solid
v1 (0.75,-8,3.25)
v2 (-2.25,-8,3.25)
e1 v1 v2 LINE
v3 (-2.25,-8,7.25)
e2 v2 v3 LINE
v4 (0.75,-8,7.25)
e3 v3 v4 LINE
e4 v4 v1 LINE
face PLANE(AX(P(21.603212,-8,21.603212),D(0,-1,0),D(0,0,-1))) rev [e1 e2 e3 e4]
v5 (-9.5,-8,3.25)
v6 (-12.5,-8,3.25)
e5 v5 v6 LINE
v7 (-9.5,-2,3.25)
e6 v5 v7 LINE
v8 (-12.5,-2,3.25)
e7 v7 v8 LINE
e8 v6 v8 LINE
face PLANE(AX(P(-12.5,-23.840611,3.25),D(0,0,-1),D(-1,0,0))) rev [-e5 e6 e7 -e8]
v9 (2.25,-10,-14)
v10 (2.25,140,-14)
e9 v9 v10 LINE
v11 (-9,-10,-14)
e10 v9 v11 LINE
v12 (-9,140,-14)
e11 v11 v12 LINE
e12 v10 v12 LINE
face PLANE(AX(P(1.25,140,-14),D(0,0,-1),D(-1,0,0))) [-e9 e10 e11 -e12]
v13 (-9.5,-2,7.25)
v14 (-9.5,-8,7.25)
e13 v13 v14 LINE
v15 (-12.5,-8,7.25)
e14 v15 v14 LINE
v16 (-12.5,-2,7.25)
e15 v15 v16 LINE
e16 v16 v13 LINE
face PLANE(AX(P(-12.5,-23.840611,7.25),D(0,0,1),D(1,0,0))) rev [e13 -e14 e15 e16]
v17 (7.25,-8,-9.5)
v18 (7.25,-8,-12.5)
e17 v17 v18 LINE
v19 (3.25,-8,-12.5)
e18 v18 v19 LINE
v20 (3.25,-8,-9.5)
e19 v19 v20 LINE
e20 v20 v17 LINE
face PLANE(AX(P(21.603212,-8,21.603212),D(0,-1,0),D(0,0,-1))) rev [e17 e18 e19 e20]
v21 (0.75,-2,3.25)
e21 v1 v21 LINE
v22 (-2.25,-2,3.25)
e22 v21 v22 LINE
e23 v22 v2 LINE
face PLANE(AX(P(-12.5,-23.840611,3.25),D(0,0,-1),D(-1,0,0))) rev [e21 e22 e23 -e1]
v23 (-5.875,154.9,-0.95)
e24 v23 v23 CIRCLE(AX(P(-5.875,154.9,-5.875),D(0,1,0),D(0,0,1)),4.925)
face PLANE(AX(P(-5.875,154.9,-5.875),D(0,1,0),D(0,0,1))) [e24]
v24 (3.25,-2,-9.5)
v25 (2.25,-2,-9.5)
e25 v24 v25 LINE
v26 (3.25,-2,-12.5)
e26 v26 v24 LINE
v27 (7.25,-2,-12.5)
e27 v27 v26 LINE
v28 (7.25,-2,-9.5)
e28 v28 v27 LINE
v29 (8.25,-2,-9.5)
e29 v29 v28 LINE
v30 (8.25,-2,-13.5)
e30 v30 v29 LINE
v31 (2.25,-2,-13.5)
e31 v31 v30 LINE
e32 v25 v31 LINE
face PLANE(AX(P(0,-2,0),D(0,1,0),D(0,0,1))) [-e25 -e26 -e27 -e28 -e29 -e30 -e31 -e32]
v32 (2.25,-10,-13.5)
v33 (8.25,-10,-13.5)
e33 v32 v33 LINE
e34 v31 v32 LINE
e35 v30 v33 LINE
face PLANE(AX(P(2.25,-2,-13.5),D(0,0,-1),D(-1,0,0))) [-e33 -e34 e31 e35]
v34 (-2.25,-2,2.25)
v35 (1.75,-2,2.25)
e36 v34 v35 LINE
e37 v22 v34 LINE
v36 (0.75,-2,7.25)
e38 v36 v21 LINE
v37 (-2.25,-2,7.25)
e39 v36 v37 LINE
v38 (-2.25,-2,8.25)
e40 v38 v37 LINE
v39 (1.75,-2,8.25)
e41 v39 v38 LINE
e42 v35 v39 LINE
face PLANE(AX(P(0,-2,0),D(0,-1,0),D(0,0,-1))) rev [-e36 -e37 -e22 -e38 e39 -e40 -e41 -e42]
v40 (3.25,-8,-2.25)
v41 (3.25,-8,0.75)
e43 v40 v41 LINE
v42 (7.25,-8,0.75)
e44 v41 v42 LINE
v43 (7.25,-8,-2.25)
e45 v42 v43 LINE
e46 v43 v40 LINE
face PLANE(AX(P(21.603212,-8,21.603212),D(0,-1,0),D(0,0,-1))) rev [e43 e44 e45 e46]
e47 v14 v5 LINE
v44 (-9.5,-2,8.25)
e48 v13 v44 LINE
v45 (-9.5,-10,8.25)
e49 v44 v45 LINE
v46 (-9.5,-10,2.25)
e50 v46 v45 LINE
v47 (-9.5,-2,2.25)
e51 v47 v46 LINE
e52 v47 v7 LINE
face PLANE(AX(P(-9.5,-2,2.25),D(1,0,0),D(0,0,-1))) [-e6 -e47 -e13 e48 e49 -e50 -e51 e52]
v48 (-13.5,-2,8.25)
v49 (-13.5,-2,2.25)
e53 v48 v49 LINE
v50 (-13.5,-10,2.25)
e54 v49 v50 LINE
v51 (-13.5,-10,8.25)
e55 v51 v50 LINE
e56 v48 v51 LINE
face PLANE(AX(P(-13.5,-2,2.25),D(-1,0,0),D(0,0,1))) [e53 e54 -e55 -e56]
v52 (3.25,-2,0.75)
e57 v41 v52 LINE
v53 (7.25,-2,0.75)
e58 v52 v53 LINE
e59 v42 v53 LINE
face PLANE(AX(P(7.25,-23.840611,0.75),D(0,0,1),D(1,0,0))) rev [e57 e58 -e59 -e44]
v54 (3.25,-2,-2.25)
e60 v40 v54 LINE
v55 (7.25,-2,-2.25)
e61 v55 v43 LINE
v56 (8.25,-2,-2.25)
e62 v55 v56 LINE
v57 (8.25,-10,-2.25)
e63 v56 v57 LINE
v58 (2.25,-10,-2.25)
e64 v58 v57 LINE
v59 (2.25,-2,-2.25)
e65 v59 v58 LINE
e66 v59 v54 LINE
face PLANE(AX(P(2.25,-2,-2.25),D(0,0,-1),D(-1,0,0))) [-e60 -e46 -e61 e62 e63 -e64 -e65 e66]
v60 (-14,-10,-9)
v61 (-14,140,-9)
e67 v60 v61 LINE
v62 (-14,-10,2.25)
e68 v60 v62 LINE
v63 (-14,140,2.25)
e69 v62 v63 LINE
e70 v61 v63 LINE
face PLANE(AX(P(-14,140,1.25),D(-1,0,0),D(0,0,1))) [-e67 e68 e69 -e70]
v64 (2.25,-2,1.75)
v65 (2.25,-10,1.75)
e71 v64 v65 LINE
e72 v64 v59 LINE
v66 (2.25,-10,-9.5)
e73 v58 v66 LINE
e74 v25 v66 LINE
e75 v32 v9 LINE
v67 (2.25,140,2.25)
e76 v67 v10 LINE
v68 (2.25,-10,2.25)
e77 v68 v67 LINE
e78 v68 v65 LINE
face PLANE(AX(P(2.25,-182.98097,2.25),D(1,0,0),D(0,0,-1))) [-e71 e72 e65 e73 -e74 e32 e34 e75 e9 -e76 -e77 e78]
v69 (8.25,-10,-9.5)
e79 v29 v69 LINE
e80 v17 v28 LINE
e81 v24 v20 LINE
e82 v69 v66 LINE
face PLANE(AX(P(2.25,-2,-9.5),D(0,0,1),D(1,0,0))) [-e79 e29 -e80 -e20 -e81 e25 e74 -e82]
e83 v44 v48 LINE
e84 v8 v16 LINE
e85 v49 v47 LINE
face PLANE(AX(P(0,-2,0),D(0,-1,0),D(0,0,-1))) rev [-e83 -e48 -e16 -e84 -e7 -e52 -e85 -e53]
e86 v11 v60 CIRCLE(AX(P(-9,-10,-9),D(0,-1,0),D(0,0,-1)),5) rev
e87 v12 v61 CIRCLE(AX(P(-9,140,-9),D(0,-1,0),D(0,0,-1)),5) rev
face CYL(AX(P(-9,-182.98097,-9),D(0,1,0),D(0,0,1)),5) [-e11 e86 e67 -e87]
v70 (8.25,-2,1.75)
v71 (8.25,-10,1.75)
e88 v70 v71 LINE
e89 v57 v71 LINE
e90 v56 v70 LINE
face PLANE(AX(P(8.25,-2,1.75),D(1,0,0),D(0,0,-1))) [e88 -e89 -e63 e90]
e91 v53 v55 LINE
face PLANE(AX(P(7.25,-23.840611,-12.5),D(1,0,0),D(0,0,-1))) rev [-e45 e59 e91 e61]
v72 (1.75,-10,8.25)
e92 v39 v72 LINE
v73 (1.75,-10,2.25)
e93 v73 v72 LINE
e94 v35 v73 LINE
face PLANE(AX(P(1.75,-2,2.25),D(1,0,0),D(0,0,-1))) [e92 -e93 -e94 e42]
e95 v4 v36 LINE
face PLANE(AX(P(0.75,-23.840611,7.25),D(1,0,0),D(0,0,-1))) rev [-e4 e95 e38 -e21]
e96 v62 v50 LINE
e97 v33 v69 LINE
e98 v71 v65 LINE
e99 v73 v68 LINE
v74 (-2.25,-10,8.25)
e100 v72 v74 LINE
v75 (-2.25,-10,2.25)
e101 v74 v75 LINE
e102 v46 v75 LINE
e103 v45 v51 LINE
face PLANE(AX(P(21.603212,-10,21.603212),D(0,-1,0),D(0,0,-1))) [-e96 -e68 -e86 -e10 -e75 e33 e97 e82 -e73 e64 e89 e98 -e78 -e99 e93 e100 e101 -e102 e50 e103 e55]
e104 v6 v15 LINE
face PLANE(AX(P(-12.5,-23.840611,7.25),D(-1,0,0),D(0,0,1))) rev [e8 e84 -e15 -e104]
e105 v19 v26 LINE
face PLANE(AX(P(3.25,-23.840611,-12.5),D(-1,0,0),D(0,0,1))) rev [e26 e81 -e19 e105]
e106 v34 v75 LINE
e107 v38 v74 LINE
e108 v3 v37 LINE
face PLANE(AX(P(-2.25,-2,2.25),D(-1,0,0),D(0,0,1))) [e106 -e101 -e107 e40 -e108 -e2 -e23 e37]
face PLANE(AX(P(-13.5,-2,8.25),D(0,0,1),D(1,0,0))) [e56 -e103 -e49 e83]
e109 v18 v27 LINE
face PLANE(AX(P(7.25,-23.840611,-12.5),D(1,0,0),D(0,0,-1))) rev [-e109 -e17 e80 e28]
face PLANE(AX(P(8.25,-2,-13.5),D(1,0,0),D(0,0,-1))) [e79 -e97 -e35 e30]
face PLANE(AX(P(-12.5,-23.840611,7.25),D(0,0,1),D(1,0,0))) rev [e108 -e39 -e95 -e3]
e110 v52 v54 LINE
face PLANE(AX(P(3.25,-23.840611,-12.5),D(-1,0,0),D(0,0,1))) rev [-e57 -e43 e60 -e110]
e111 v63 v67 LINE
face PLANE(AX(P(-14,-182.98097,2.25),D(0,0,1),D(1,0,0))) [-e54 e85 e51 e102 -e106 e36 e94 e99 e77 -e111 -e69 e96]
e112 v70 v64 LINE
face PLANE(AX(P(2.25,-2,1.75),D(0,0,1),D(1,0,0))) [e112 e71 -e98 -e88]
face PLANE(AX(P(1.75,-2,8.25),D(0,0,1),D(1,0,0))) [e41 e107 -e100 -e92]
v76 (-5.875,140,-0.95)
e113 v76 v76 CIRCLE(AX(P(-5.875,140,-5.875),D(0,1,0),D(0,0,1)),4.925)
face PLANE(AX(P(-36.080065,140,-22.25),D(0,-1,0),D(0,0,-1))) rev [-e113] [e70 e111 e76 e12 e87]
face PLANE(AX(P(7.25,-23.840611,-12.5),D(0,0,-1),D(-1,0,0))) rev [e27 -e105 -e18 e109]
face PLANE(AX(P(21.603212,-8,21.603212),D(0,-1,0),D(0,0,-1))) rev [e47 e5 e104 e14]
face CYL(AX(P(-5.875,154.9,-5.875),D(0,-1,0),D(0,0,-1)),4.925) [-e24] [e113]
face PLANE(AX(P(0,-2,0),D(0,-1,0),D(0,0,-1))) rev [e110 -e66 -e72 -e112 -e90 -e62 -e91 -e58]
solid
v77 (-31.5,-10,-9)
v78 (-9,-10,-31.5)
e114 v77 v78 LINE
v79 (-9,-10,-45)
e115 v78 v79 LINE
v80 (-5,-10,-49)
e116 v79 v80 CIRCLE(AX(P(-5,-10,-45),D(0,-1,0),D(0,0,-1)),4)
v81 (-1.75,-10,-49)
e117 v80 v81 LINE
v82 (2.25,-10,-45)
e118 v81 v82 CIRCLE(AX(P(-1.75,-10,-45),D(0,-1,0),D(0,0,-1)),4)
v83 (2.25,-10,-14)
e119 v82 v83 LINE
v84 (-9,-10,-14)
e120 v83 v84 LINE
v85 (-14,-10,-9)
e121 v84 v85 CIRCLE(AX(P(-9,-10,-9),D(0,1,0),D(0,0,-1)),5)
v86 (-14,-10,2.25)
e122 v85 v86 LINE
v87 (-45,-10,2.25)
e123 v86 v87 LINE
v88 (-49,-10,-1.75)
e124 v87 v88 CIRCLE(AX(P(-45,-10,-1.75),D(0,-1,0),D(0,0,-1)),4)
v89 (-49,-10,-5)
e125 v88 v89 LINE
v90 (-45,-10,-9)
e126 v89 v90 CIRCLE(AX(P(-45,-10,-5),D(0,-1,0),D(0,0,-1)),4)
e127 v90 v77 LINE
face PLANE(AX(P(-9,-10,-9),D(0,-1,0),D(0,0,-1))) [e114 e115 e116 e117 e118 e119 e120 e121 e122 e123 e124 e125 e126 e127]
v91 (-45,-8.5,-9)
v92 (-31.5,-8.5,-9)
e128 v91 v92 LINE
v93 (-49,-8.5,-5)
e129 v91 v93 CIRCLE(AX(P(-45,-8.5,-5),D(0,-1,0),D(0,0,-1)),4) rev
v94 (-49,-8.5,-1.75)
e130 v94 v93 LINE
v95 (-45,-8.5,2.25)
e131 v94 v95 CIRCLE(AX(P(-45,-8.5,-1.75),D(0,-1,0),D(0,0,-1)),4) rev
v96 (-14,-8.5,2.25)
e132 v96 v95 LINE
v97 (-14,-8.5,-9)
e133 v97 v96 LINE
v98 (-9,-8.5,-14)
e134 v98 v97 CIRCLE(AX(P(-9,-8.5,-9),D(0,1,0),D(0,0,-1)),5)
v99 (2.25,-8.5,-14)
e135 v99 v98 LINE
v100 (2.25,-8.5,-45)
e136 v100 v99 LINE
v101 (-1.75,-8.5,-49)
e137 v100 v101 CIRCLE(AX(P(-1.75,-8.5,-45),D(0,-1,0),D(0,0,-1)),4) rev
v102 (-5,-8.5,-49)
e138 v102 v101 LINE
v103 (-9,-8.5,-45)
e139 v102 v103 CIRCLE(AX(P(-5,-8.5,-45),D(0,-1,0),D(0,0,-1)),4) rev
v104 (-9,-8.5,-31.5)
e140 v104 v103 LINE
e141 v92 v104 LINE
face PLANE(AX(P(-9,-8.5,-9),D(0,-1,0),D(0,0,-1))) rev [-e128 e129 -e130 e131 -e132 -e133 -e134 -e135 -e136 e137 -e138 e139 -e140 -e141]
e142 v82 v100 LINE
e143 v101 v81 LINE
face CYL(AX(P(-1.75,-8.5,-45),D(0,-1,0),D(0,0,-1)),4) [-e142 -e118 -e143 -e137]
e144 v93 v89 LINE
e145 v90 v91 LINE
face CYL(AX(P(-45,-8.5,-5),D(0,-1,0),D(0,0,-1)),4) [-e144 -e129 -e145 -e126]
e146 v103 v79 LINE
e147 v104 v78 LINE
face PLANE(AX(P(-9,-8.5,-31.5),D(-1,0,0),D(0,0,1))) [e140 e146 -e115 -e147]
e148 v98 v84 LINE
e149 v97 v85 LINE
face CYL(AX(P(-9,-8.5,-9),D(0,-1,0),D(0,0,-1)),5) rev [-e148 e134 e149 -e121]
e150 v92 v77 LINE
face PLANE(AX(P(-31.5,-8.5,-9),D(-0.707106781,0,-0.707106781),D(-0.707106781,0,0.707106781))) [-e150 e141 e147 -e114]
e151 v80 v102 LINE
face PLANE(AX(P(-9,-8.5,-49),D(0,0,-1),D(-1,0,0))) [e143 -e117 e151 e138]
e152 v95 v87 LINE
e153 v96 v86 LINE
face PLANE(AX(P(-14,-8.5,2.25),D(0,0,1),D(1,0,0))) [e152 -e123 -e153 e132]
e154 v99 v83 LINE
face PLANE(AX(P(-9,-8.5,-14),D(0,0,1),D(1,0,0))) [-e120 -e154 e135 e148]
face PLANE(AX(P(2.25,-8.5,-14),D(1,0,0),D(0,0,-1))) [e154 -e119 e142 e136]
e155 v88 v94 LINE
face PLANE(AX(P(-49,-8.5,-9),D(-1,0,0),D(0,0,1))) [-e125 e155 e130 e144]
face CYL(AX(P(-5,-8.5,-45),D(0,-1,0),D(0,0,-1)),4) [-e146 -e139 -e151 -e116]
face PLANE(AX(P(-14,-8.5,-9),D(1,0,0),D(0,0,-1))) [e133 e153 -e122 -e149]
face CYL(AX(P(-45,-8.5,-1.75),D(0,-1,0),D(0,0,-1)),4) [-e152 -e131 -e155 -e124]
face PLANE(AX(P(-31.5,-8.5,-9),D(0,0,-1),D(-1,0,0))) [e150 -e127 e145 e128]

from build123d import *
from build123d.topology import SkipClean

# Parameters (mm, degrees)
SKETCH1_W                = 30
SKETCH1_H                = 30
BOSS_EXTRUDE1_DEPTH      = 80
SKETCH2_R                = 6
BOSS_EXTRUDE2_DEPTH      = 22
CUT_EXTRUDE1_DEPTH       = 83.764726786
BOSS_EXTRUDE3_DEPTH      = 100
BOSS_EXTRUDE5_DEPTH      = 2
BOSS_EXTRUDE6_DEPTH      = 23
BOSS_EXTRUDE7_DEPTH      = 25
FILLET1_R                = 2
SKETCH11_R               = 6.055782361
CUT_EXTRUDE2_DEPTH       = 2.125
SKETCH12_W               = 13.25
SKETCH12_H               = 8.5
CUT_EXTRUDE4_DEPTH       = 13.25
CUT_EXTRUDE5_REACH       = 204.341
SKETCH15_W               = 3.75
SKETCH15_H               = 3.75
FILLET2_R                = 1
CUT_EXTRUDE7_START       = 22
SKETCH16_R               = 6
CUT_EXTRUDE7_DEPTH       = 22
SKETCH17_R               = 15
BOSS_EXTRUDE8_DEPTH      = 40
FILLET3_R                = 1
SKETCH18_R               = 15
SKETCH18_R_2             = 7.5
BOSS_EXTRUDE9_DEPTH      = 2
SKETCH22_R               = 209.016423622
CUT_EXTRUDE8_DEPTH       = 225.815151847
SKETCH23_W               = 22.070362909
SKETCH23_H               = 16.212180161
CUT_EXTRUDE9_DEPTH       = 65.514197169
SKETCH24_R               = 15
BOSS_EXTRUDE10_DEPTH     = 40
SKETCH25_R               = 15
SKETCH25_R_2             = 7.5
BOSS_EXTRUDE11_DEPTH     = 2
BOSS_EXTRUDE12_DEPTH     = 40
SKETCH29_R               = 2
CUT_EXTRUDE10_DEPTH      = 209.128716183
SKETCH30_R               = 3.025
CUT_EXTRUDE11_DEPTH      = 2.1
CUT_EXTRUDE12_DEPTH      = 111.386253673
CUT_EXTRUDE12_DEPTH_BACK = 111.386253673
SKETCH31_W               = 80
SKETCH31_H               = 80
BOSS_EXTRUDE13_DEPTH     = 190
CUT_EXTRUDE13_DEPTH      = 191.213565988
CUT_EXTRUDE13_DEPTH_BACK = 191.213565988
SKETCH33_W               = 105.751798623
SKETCH33_H               = 51.18837061
SKETCH34_R               = 4.925
BOSS_EXTRUDE14_DEPTH     = 14.9
SKETCH35_W               = 6
SKETCH35_H               = 4
SKETCH35_W_2             = 4
SKETCH35_H_2             = 6
BOSS_EXTRUDE15_DEPTH     = 8
SKETCH36_W               = 13.25
SKETCH36_H               = 4
SKETCH36_W_2             = 4
SKETCH36_H_2             = 13.25
CUT_EXTRUDE14_DEPTH      = 6
BOSS_EXTRUDE16_DEPTH     = 1.5
FILLET4_R                = 4


with BuildPart() as part:
    # Sketch1 → Boss-Extrude1 (new body)
    with BuildSketch(Plane(origin=(0, 0, 0), x_dir=(1, 0, 0), z_dir=(0, 1, 0))):
        Rectangle(SKETCH1_W, SKETCH1_H)
    extrude(amount=BOSS_EXTRUDE1_DEPTH)

    # Sketch2 → Boss-Extrude2 (add)
    with BuildSketch(Plane(origin=(0, 80, 0), x_dir=(1, 0, 0), z_dir=(0, 1, 0))):
        with Locations(Location((9, -9, 0), (0, 0, 270))):
            Circle(SKETCH2_R)
    extrude(amount=BOSS_EXTRUDE2_DEPTH)

    # Sketch3 → Cut-Extrude1 (cut, through all)
    with BuildSketch(Plane(origin=(0, 80, 0), x_dir=(1, 0, 0), z_dir=(0, 1, 0))):
        with BuildLine():
            Line((9, -15), (15, -15))
            Line((15, -15), (15, -9))
            ThreePointArc((15, -9), (13.242640687, -13.242640687), (9, -15))
        make_face()
    extrude(amount=-CUT_EXTRUDE1_DEPTH, mode=Mode.SUBTRACT)

    # Sketch4 → Boss-Extrude3 (add)
    with BuildSketch(Plane(origin=(0, 80, 0), x_dir=(1, 0, 0), z_dir=(0, 1, 0))):
        Polygon((-8.25, 11.25), (-8.25, 8.25), (-11.25, 8.25), (-15, 8.25), (-15, 11.25), (-11.25, 11.25), (-11.25, 15), (-8.25, 15), align=None)
        Polygon((-1.75, 1.75), (-11.25, 1.75), (-15, 1.75), (-15, -1.25), (-11.25, -1.25), (1.25, -1.25), (1.25, 11.25), (1.25, 15), (-1.75, 15), (-1.75, 11.25), align=None)
    extrude(amount=BOSS_EXTRUDE3_DEPTH)

    # Sketch6 → Boss-Extrude5 (add)
    with BuildSketch(Plane.XZ):
        with BuildLine():
            Line((15, -15), (7, -15))
            Line((7, -15), (7, -99.5))
            ThreePointArc((7, -99.5), (2.757359313, -109.742640687), (13, -105.5))
            Line((13, -105.5), (15, -105.5))
            Line((15, -105.5), (15, -15))
        make_face()
    extrude(amount=-BOSS_EXTRUDE5_DEPTH)

    # Sketch7 → Boss-Extrude6 (add)
    with SkipClean():  # the faces are left unmerged after this step: merging them gives an invalid solid
        with BuildSketch(Plane(origin=(0, 2, 0), x_dir=(1, 0, 0), z_dir=(0, 1, 0))):
            with BuildLine():
                Line((9, 111.156854249), (9, 108.964101615))
                ThreePointArc((9, 108.964101615), (7, 101.5), (5, 108.964101615))
                Line((5, 108.964101615), (5, 111.156854249))
                ThreePointArc((5, 111.156854249), (1.086408642, 104.485388128), (7, 99.5))
                Line((7, 99.5), (7, 15))
                Line((7, 15), (15, 15))
                Line((15, 15), (15, 105.5))
                Line((15, 105.5), (13, 105.5))
                ThreePointArc((13, 105.5), (11.898979486, 108.964101615), (9, 111.156854249))
            make_face()
        extrude(amount=BOSS_EXTRUDE6_DEPTH)

    # Sketch9 → Boss-Extrude7 (add)
    with SkipClean():  # the faces are left unmerged after this step: merging them gives an invalid solid
        with BuildSketch(Plane.XZ):
            with BuildLine():
                Line((-15, 15), (-15, 7))
                Line((-15, 7), (-126.175, 7))
                ThreePointArc((-126.175, 7), (-126.252697751, 6.037536458), (-126.48377869, 5.1))
                Line((-126.48377869, 5.1), (-128.797778509, 5.1))
                ThreePointArc((-128.797778509, 5.1), (-136.05, 7), (-128.797778509, 8.9))
                Line((-128.797778509, 8.9), (-126.3, 8.9))
                ThreePointArc((-126.3, 8.9), (-128.491885554, 11.955834237), (-132.050001601, 13.173329766))
                Line((-132.050001601, 13.173329766), (-132.050001601, 15))
                Line((-132.050001601, 15), (-15, 15))
            make_face()
        extrude(amount=-BOSS_EXTRUDE7_DEPTH)

    # Fillet1
    fillet1_edges = [part.edges().sort_by_distance(p)[0] for p in [
        (-126.175, 12.5, 7),
    ]]
    fillet(fillet1_edges, radius=FILLET1_R)

    # Sketch11 → Cut-Extrude2 (cut)
    with SkipClean():  # the faces are left unmerged after this step: merging them gives an invalid solid
        with BuildSketch(Plane.XZ):
            with Locations((-132.175, 7)):
                Circle(SKETCH11_R)
        extrude(amount=-CUT_EXTRUDE2_DEPTH, mode=Mode.SUBTRACT)

    # Sketch12 → Cut-Extrude4 (cut)
    with SkipClean():  # the faces are left unmerged after this step: merging them gives an invalid solid
        with BuildSketch(Plane.ZY.offset(15)):
            with Locations((-8.375, 72.75)):
                Rectangle(SKETCH12_W, SKETCH12_H)
        extrude(amount=-CUT_EXTRUDE4_DEPTH, mode=Mode.SUBTRACT)

    # Sketch15 → Cut-Extrude5 (cut, up to next)
    with BuildSketch(Plane(origin=(0, 80, 0), x_dir=(1, 0, 0), z_dir=(0, 1, 0)), mode=Mode.PRIVATE) as cut_extrude5_sk1:
        with Locations((-13.125, 13.125)):
            Rectangle(SKETCH15_W, SKETCH15_H)
    cut_extrude5_tool1 = extrude(cut_extrude5_sk1.sketch, amount=-CUT_EXTRUDE5_REACH, mode=Mode.PRIVATE) & part.part
    add(cut_extrude5_tool1.solids().sort_by_distance((-13.125, 80, -13.125))[0], mode=Mode.SUBTRACT)

    # Fillet2
    fillet2_edges = [part.edges().sort_by_distance(p)[0] for p in [
        (-11.25, 130, -15),
        (-11.25, 130, -11.25),
        (-15, 130, -11.25),
        (-15, 130, 1.25),
        (1.25, 130, -15),
    ]]
    fillet(fillet2_edges, radius=FILLET2_R)

    # Sketch16 → Cut-Extrude7 (cut)
    with SkipClean():  # the faces are left unmerged after this step: merging them gives an invalid solid
        with BuildSketch(Plane(origin=(0, 80, 0), x_dir=(1, 0, 0), z_dir=(0, 1, 0)).offset(CUT_EXTRUDE7_START)):
            with Locations((9, -9)):
                Circle(SKETCH16_R)
        extrude(amount=-CUT_EXTRUDE7_DEPTH, mode=Mode.SUBTRACT)


with BuildPart() as cut_extrude7_kept_piece:
    # of the separate pieces the step leaves, the one the design keeps (cut_extrude7_pieces_kept)
    add(part.part.solids().sort_by_distance((-15, 80, 0.25))[0])

    # Sketch17 → Boss-Extrude8 (add)
    with SkipClean():  # the faces are left unmerged after this step: merging them gives an invalid solid
        with BuildSketch(Plane(origin=(0, 180, 0), x_dir=(1, 0, 0), z_dir=(0, 1, 0))):
            with BuildLine():
                Line((-14, -1.25), (-14, -4.216394713))
                ThreePointArc((-14, -4.216394713), (-14.384018227, -33.129332993), (11.657578086, -20.561885701))
                ThreePointArc((11.657578086, -20.561885701), (14.532144442, -14.532144442), (20.561885701, -11.657578086))
                ThreePointArc((20.561885701, -11.657578086), (33.129332993, 14.384018227), (4.216394713, 14))
                Line((4.216394713, 14), (1.25, 14))
                Line((1.25, 14), (1.25, -1.25))
                Line((1.25, -1.25), (-14, -1.25))
            make_face()
            with Locations(Location((18.79163056, 5.25, 0), (0, 0, 270))):
                Circle(SKETCH17_R, mode=Mode.SUBTRACT)
            with Locations(Location((-5.25, -18.79163056, 0), (0, 0, 270))):
                Circle(SKETCH17_R, mode=Mode.SUBTRACT)
        extrude(amount=-BOSS_EXTRUDE8_DEPTH)

    # Fillet3
    # the kernel refuses this fillet: 1 mm, written as the material it adds along each edge
    with BuildSketch(Plane(origin=(-14, 140, 1.25), x_dir=(-0.9659258262890684, 0, -0.25881904510252046), z_dir=(0, 1, 0))) as fillet3_piece_1:
        with BuildLine():
            CenterArc((0.776457135, 0.965925826), FILLET3_R, 195, 60)
            Line((-0.189468691, 0.707106781), (0, 0))
            ThreePointArc((0, 0), (0.258819045, 0.034074174), (0.51763809, 0))
        make_face()
    extrude(amount=40)
    with BuildSketch(Plane(origin=(-14, 180, 4.216394713), x_dir=(0, 0, -1), z_dir=(0, -1, 0))) as fillet3_piece_2:
        with BuildLine():
            CenterArc((0.555444904, -1), FILLET3_R, 90, 57.202831704)
            ThreePointArc((-0.285148471, -0.458333333), (-0.140754957, -0.230298516), (0, 0))
            Line((0, 0), (0.555444904, 0))
        make_face()
    extrude(amount=40)
    with BuildSketch(Plane(origin=(1.25, 140, -14), x_dir=(-0.2588190451025201, 0, -0.9659258262890685), z_dir=(0, 1, 0))) as fillet3_piece_3:
        with BuildLine():
            CenterArc((0.776457135, -0.965925826), FILLET3_R, 105, 60)
            Line((-0.189468691, -0.707106781), (0, 0))
            ThreePointArc((0, 0), (0.258819045, -0.034074174), (0.51763809, 0))
        make_face()
    extrude(amount=40)
    with BuildSketch(Plane(origin=(4.216394713, 180, -14), x_dir=(-1, 0, 0), z_dir=(0, -1, 0))) as fillet3_piece_4:
        with BuildLine():
            CenterArc((0.555444904, 1), FILLET3_R, 212.797168296, 57.202831704)
            ThreePointArc((-0.285148471, 0.458333333), (-0.140754957, 0.230298516), (0, 0))
            Line((0, 0), (0.555444904, 0))
        make_face()
    extrude(amount=40)

    # Sketch18 → Boss-Extrude9 (add)
    with SkipClean():  # the faces are left unmerged after this step: merging them gives an invalid solid
        with BuildSketch(Plane.XZ.offset(-140)):
            with Locations(Location((-5.25, 18.79163056, 0), (0, 0, 90))):
                Circle(SKETCH18_R)
            with Locations(Location((-5.25, 18.79163056, 0), (0, 0, 270))):
                Circle(SKETCH18_R_2, mode=Mode.SUBTRACT)
        boss_extrude9 = extrude(amount=-BOSS_EXTRUDE9_DEPTH)

    # Sketch21 → Revolve1 (revolve)
    with SkipClean():  # the faces are left unmerged after this step: merging them gives an invalid solid
        with BuildSketch(Plane(origin=(-5.25, 0, 0), x_dir=(0, 0, -1), z_dir=(-1, 0, 0)), mode=Mode.PRIVATE) as revolve1_sk:
            Polygon((-11.29163056, -142), (-3.79163056, -154.5), (-3.79163056, -142), align=None)
        revolve1 = revolve(revolve1_sk.sketch.rotate(Axis((-5.25, 1065, 18.79163056), (0, -1, 0)), 180), axis=Axis((-5.25, 1065, 18.79163056), (0, -1, 0)))

    # Mirror1: Boss-Extrude9, Revolve1 across plane
    with SkipClean():  # the faces are left unmerged after this step: merging them gives an invalid solid
        add(boss_extrude9.mirror(Plane(origin=(0, 0, 0), x_dir=(0.7071067811865478, 0, 0.7071067811865472), z_dir=(0.7071067811865475, 0, -0.7071067811865477))))
        add(revolve1.mirror(Plane(origin=(0, 0, 0), x_dir=(0.7071067811865478, 0, 0.7071067811865472), z_dir=(0.7071067811865475, 0, -0.7071067811865477))))

    # Sketch22 → Cut-Extrude8 (cut, through all)
    with BuildSketch(Plane.XZ.offset(-140)):
        Circle(SKETCH22_R)
    extrude(amount=CUT_EXTRUDE8_DEPTH, mode=Mode.SUBTRACT)


with BuildPart() as cut_extrude8_piece_1:
    # of the separate pieces the step leaves, piece 1, a body of its own (cut_extrude8_pieces)
    add(cut_extrude7_kept_piece.part.solids().sort_by_distance((4.501543184, 180, -14.458333333))[0])

    # Sketch24 → Boss-Extrude10 (add)
    with BuildSketch(Plane(origin=(0, 180, 0), x_dir=(1, 0, 0), z_dir=(0, 1, 0))):
        with BuildLine():
            ThreePointArc((13.834213525, -37.57835306), (39.612293374, -39.612293374), (37.57835306, -13.834213525))
            ThreePointArc((37.57835306, -13.834213525), (33.79372713, -8.329895406), (34.31915027, -1.67070312))
            ThreePointArc((34.31915027, -1.67070312), (28.778505526, -8.507264569), (20.561885701, -11.657578086))
            ThreePointArc((20.561885701, -11.657578086), (14.532144442, -14.532144442), (11.657578086, -20.561885701))
            ThreePointArc((11.657578086, -20.561885701), (8.507264569, -28.778505526), (1.67070312, -34.31915027))
            ThreePointArc((1.67070312, -34.31915027), (8.329895406, -33.79372713), (13.834213525, -37.57835306))
        make_face()
        with Locations(Location((27.591478094, -27.591478094, 0), (0, 0, 270))):
            Circle(SKETCH24_R, mode=Mode.SUBTRACT)
    extrude(amount=-BOSS_EXTRUDE10_DEPTH)

    # Sketch25 → Boss-Extrude11 (add)
    with BuildSketch(Plane.XZ.offset(-140)):
        with Locations(Location((27.591478094, 27.591478094, 0), (0, 0, 90))):
            Circle(SKETCH25_R)
        with Locations(Location((27.591478094, 27.591478094, 0), (0, 0, 270))):
            Circle(SKETCH25_R_2, mode=Mode.SUBTRACT)
    extrude(amount=-BOSS_EXTRUDE11_DEPTH)

    # Sketch26 → Revolve2 (revolve)
    with BuildSketch(Plane(origin=(0, 0, 0), x_dir=(-0.7071067811865476, 0, -0.7071067811865475), z_dir=(0.7071067811865475, 0, -0.7071067811865476)), mode=Mode.PRIVATE) as revolve2_sk:
        Polygon((-24.020242526, 142), (-24.020242526, 154.5), (-31.520242526, 142), align=None)
    revolve(revolve2_sk.sketch.rotate(Axis((27.591478094, 126.995387654, 27.591478094), (0, 1, 0)), 135), axis=Axis((27.591478094, 126.995387654, 27.591478094), (0, 1, 0)))

    # Sketch27 → Boss-Extrude12 (add)
    with BuildSketch(Plane(origin=(0, 180, 0), x_dir=(1, 0, 0), z_dir=(0, 1, 0))):
        Polygon((2.25, -2.25), (2.25, 72.75), (-1.75, 72.75), (-1.75, 1.75), (-72.75, 1.75), (-72.75, -2.25), align=None)
    extrude(amount=-BOSS_EXTRUDE12_DEPTH)

    # Sketch29 → Cut-Extrude10 (cut, through all)
    with BuildSketch(Plane.XY.offset(2.25)):
        with Locations((-24, 144)):
            Circle(SKETCH29_R)
        with Locations((-24, 176)):
            Circle(SKETCH29_R)
        with Locations((-68.75, 144)):
            Circle(SKETCH29_R)
        with Locations((-68.75, 176)):
            Circle(SKETCH29_R)
    cut_extrude10 = extrude(amount=-CUT_EXTRUDE10_DEPTH, mode=Mode.SUBTRACT)

    # Sketch30 → Cut-Extrude11 (cut)
    with BuildSketch(Plane(origin=(0, 0, -1.75), x_dir=(-1, 0, 0), z_dir=(0, 0, -1))):
        with Locations((14.135, 148)):
            Circle(SKETCH30_R)
        with Locations((29.545, 148)):
            Circle(SKETCH30_R)
        with Locations((44.955, 148)):
            Circle(SKETCH30_R)
        with Locations((60.365, 148)):
            Circle(SKETCH30_R)
        with Locations(Location((60.365, 172, 0), (0, 0, 180))):
            Circle(SKETCH30_R)
        with Locations(Location((44.955, 172, 0), (0, 0, 180))):
            Circle(SKETCH30_R)
        with Locations(Location((29.545, 172, 0), (0, 0, 180))):
            Circle(SKETCH30_R)
        with Locations(Location((14.135, 172, 0), (0, 0, 180))):
            Circle(SKETCH30_R)
    cut_extrude11 = extrude(amount=-CUT_EXTRUDE11_DEPTH, mode=Mode.SUBTRACT)

    # Mirror2: Cut-Extrude10, Cut-Extrude11 across plane
    add(cut_extrude10.mirror(Plane(origin=(0, 0, 0), x_dir=(0.7071067811865476, 0, 0.7071067811865475), z_dir=(0.7071067811865475, 0, -0.7071067811865476))), mode=Mode.SUBTRACT)
    add(cut_extrude11.mirror(Plane(origin=(0, 0, 0), x_dir=(0.7071067811865476, 0, 0.7071067811865475), z_dir=(0.7071067811865475, 0, -0.7071067811865476))), mode=Mode.SUBTRACT)

    # Sketch31 → Cut-Extrude12 (cut, two sides: drawn at the far end of the back side and taken through both)
    with BuildSketch(Plane(origin=(0, 180, 0), x_dir=(1, 0, 0), z_dir=(0, 1, 0)).offset(-CUT_EXTRUDE12_DEPTH_BACK)):
        with Locations((-37.75, 37.75)):
            Rectangle(SKETCH31_W, SKETCH31_H)
    extrude(amount=CUT_EXTRUDE12_DEPTH + CUT_EXTRUDE12_DEPTH_BACK, mode=Mode.SUBTRACT)

    # Sketch32 → Boss-Extrude13 (add)
    with BuildSketch(Plane(origin=(0, 180, 0), x_dir=(1, 0, 0), z_dir=(0, 1, 0))):
        with BuildLine():
            Line((-14, -2.25), (2.25, -2.25))
            Line((2.25, -2.25), (2.25, 14))
            Line((2.25, 14), (-9, 14))
            ThreePointArc((-9, 14), (-12.535533906, 12.535533906), (-14, 9))
            Line((-14, 9), (-14, -2.25))
        make_face()
    extrude(amount=-BOSS_EXTRUDE13_DEPTH)

    # Sketch33 → Cut-Extrude13 (cut, two sides: drawn at the far end of the back side and taken through both)
    with BuildSketch(Plane.XY.offset(2.25).offset(-CUT_EXTRUDE13_DEPTH_BACK)):
        with Locations((16.795834719, 165.594185305)):
            Rectangle(SKETCH33_W, SKETCH33_H)
    extrude(amount=CUT_EXTRUDE13_DEPTH + CUT_EXTRUDE13_DEPTH_BACK, mode=Mode.SUBTRACT)

    # Sketch34 → Boss-Extrude14 (add)
    with BuildSketch(Plane(origin=(0, 140, 0), x_dir=(1, 0, 0), z_dir=(0, 1, 0))):
        with Locations(Location((-5.875, 5.875, 0), (0, 0, 270))):
            Circle(SKETCH34_R)
    extrude(amount=BOSS_EXTRUDE14_DEPTH)

    # Sketch35 → Boss-Extrude15 (add)
    with BuildSketch(Plane.XZ.offset(10)):
        with Locations((5.25, -11.5)):
            Rectangle(SKETCH35_W, SKETCH35_H)
        with Locations((5.25, -0.25)):
            Rectangle(SKETCH35_W, SKETCH35_H)
        with Locations((-11.5, 5.25)):
            Rectangle(SKETCH35_W_2, SKETCH35_H_2)
        with Locations((-0.25, 5.25)):
            Rectangle(SKETCH35_W_2, SKETCH35_H_2)
    extrude(amount=-BOSS_EXTRUDE15_DEPTH)

    # Sketch36 → Cut-Extrude14 (cut)
    with BuildSketch(Plane(origin=(0, -2, 0), x_dir=(1, 0, 0), z_dir=(0, 1, 0))):
        with Locations((-5.875, -5.25)):
            Rectangle(SKETCH36_W, SKETCH36_H)
        with Locations((5.25, 5.875)):
            Rectangle(SKETCH36_W_2, SKETCH36_H_2)
    extrude(amount=-CUT_EXTRUDE14_DEPTH, mode=Mode.SUBTRACT)


with BuildPart() as cut_extrude8_piece_2:
    # of the separate pieces the step leaves, piece 2, a body of its own (cut_extrude8_pieces)
    add(cut_extrude7_kept_piece.part.solids().sort_by_distance((-10.25, 140, -15))[0])

    # Sketch23 → Cut-Extrude9 (cut, through all)
    with BuildSketch(Plane(origin=(0, 180, 0), x_dir=(1, 0, 0), z_dir=(0, 1, 0))):
        with Locations((-15.719387653, 13.178118111)):
            Rectangle(SKETCH23_W, SKETCH23_H)
    extrude(amount=-CUT_EXTRUDE9_DEPTH, mode=Mode.SUBTRACT)


with BuildPart() as body_2:
    # Sketch37 → Boss-Extrude16 (new body)
    with BuildSketch(Plane.XZ.offset(10)):
        with BuildLine():
            Line((-9, -14), (2.25, -14))
            Line((2.25, -14), (2.25, -49))
            Line((2.25, -49), (-9, -49))
            Line((-9, -49), (-9, -31.5))
            Line((-9, -31.5), (-31.5, -9))
            Line((-31.5, -9), (-49, -9))
            Line((-49, -9), (-49, 2.25))
            Line((-49, 2.25), (-14, 2.25))
            Line((-14, 2.25), (-14, -9))
            ThreePointArc((-14, -9), (-12.535533906, -12.535533906), (-9, -14))
        make_face()
    extrude(amount=-BOSS_EXTRUDE16_DEPTH)

    # Fillet4
    fillet4_edges = [body_2.edges().sort_by_distance(p)[0] for p in [
        (2.25, -9.25, -49),
        (-9, -9.25, -49),
        (-49, -9.25, -9),
        (-49, -9.25, 2.25),
    ]]
    fillet(fillet4_edges, radius=FILLET4_R)


solid = Compound([cut_extrude8_piece_1.part, body_2.part])
